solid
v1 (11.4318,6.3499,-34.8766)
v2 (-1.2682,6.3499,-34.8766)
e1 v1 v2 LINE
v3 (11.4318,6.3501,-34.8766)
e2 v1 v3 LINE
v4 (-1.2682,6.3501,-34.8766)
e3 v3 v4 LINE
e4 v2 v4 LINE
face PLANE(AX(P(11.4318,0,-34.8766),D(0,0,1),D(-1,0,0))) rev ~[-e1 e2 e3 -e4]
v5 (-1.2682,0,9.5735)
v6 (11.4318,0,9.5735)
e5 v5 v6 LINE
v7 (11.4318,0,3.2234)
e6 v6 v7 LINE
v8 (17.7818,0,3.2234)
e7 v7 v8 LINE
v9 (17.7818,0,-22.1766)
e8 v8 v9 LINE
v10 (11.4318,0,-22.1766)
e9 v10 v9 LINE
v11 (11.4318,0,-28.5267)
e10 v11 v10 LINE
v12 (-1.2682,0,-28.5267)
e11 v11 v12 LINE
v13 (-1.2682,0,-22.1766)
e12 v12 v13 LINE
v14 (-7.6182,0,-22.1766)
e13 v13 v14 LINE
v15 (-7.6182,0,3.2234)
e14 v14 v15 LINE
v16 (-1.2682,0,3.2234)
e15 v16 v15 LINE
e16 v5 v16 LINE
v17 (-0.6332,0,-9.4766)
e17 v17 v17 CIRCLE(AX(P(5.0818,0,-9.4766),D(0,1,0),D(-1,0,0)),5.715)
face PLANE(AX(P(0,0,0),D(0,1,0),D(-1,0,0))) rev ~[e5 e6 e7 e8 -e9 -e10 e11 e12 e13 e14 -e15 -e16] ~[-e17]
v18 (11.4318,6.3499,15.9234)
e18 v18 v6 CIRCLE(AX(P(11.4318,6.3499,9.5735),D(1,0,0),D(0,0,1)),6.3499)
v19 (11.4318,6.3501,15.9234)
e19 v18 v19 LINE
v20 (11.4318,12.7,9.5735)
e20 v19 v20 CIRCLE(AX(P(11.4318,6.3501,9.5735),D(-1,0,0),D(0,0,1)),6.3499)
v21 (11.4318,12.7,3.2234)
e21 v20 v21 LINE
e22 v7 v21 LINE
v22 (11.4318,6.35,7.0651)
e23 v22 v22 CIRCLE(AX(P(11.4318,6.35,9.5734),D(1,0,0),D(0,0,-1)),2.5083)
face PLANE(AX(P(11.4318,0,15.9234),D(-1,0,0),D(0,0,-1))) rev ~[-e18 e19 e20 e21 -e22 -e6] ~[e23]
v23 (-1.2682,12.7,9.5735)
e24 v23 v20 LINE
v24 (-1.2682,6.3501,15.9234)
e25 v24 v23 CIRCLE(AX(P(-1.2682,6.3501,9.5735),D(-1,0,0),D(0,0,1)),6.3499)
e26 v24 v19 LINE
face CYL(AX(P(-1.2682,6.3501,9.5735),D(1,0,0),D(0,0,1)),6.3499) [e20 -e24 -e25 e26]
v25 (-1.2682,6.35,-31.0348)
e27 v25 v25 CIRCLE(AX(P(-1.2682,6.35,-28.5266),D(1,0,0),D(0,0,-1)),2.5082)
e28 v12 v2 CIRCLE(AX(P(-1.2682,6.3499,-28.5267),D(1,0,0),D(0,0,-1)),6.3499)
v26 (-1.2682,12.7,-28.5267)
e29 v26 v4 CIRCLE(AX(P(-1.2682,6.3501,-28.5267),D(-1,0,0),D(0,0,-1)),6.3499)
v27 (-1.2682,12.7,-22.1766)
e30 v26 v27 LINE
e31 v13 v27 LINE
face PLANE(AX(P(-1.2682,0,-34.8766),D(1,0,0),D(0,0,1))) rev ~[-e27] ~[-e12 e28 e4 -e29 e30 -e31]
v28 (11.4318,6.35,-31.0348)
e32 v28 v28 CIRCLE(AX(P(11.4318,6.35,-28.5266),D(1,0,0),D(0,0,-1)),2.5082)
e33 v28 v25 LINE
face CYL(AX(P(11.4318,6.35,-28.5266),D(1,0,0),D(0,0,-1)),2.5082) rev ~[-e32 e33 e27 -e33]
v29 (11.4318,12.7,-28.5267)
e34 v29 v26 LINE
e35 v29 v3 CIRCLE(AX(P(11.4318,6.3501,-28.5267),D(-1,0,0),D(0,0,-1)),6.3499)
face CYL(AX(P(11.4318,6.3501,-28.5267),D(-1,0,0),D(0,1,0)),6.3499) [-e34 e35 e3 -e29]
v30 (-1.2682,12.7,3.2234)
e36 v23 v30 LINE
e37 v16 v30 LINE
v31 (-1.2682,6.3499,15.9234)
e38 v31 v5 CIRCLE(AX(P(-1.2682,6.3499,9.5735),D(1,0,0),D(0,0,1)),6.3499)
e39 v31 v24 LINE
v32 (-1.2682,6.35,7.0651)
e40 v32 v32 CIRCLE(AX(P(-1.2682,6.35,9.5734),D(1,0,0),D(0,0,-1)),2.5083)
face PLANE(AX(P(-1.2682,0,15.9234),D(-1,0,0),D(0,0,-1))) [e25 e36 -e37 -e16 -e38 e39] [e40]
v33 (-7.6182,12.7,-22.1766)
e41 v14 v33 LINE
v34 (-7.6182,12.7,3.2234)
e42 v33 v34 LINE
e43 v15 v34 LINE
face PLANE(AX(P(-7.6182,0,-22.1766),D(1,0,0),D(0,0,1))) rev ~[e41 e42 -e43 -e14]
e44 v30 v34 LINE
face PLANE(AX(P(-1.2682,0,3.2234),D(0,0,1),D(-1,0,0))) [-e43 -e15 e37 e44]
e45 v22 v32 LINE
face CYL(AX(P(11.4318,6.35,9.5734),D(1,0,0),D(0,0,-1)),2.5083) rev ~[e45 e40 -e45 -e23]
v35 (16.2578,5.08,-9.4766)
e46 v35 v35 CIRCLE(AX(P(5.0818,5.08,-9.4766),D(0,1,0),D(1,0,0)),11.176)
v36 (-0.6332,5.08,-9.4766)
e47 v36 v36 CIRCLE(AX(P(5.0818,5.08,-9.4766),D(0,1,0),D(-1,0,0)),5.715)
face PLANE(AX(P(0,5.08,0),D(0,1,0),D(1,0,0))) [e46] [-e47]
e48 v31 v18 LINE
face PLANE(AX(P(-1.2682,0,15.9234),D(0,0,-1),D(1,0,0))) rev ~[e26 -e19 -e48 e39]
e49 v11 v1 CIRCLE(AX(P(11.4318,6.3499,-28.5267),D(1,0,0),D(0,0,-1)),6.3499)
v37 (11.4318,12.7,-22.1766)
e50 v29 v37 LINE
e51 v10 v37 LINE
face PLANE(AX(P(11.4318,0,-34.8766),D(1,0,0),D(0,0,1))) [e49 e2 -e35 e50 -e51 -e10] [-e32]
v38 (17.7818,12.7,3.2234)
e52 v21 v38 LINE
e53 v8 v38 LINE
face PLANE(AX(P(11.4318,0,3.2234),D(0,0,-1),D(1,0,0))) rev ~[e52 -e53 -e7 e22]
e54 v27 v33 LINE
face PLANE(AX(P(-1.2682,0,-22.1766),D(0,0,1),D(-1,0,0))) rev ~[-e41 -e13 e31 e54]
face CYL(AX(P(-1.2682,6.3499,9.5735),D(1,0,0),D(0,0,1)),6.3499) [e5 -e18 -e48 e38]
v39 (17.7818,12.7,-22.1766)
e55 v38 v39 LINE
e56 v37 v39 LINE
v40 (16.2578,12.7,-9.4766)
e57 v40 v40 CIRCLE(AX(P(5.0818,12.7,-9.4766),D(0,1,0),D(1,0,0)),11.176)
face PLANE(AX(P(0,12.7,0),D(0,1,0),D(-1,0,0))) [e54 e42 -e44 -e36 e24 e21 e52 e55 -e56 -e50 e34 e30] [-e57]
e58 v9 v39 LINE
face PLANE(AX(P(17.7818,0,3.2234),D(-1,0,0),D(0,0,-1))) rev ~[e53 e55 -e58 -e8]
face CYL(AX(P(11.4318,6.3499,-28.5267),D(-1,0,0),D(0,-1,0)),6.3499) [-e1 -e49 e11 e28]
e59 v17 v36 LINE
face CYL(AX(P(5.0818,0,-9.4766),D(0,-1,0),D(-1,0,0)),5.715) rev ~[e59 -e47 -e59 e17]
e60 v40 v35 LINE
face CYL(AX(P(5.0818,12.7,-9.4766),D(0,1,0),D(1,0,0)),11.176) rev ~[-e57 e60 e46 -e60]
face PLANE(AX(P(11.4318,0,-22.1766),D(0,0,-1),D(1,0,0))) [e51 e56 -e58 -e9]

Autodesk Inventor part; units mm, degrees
ref_plane "YZ Plane" through (0, 0, 0) normal (1, 0, 0) x (0, 1, 0)
ref_plane "XZ Plane" through (0, 0, 0) normal (0, 1, 0) x (-1, 0, 0)
ref_plane "XY Plane" through (0, 0, 0) normal (0, 0, 1) x (1, 0, 0)
sketch "Sketch1" plane through (0, 0, 0) normal (0, 1, 0) x (-1, 0, 0)
  line L0 (7.6182, 15.9234) -> (-17.7818, 15.9234)
  line L1 (-17.7818, 15.9234) -> (-17.7818, -34.8766)
  line L2 (-17.7818, -34.8766) -> (7.6182, -34.8766)
  line L3 (7.6182, -34.8766) -> (7.6182, 15.9234)
  line L4 (7.6182, 15.9234) -> (1.2682, 15.9234)
  line L5 (1.2682, 15.9234) -> (1.2682, 3.2234)
  line L6 (1.2682, 3.2234) -> (7.6182, 3.2234)
  line L7 (7.6182, 3.2234) -> (7.6182, 15.9234)
  line L8 (-17.7818, 15.9234) -> (-11.4318, 15.9234)
  line L9 (-11.4318, 15.9234) -> (-11.4318, 3.2234)
  line L10 (-11.4318, 3.2234) -> (-17.7818, 3.2234)
  line L11 (-17.7818, 3.2234) -> (-17.7818, 15.9234)
  line L12 (-17.7818, -34.8766) -> (-11.4318, -34.8766)
  line L13 (-11.4318, -34.8766) -> (-11.4318, -22.1766)
  line L14 (-11.4318, -22.1766) -> (-17.7818, -22.1766)
  line L15 (-17.7818, -22.1766) -> (-17.7818, -34.8766)
  line L16 (7.6182, -34.8766) -> (1.2682, -34.8766)
  line L17 (1.2682, -34.8766) -> (1.2682, -22.1766)
  line L18 (1.2682, -22.1766) -> (7.6182, -22.1766)
  line L19 (7.6182, -22.1766) -> (7.6182, -34.8766)
  circle A0 centre (-5.0818, -9.4766) radius 5.715
  point P0 (0, 0)
  dimension "d0" = 25.4
  dimension "d1" = 50.8
  dimension "d2" = 6.35
  dimension "d3" = 12.7
  dimension "d4" = 6.35
  dimension "d5" = 12.7
  dimension "d6" = 6.35
  dimension "d7" = 12.7
  dimension "d8" = 11.43
extrude "Extrusion1" add sketch "Sketch1" along normal blind 12.7 contours L5 L6 L3 L18 L17 L2 L13 L14 L1 L10 L9 L0
sketch "Sketch2" plane through (11.4318, 0, 3.2234) normal (1, 0, 0) x (0, 0, -1)
  line L0 (-12.7, 0) -> (-12.7, 12.7) projected
  line L1 (-12.7, 12.7) -> (0, 12.7) projected
  line L2 (38.1, 12.7) -> (38.1, 0) projected
  circle A0 centre (-6.35, 6.35) radius 2.5083
  circle A1 centre (31.75, 6.35) radius 2.5082
  point P0 (3.2234, 0)
  dimension "d11" = 6.35
  dimension "d12" = 6.35
  dimension "d13" = 6.35
  dimension "d14" = 5.0165
  dimension "d15" = 5.0165
extrude "Extrusion2" cut sketch "Sketch2" against normal through all
sketch "Sketch3" plane through (0, 12.7, 0) normal (0, 1, 0) x (1, 0, 0)
  circle A0 centre (5.0818, 9.4766) radius 5.715 projected
  circle A1 centre (5.0818, 9.4766) radius 11.176
  point P0 (0, 0)
  dimension "d18" = 22.352
extrude "Extrusion3" cut sketch "Sketch3" against normal blind 7.62
fillet "Fillet1" radius 6.35 4 edges at (5.0818, 12.7, 15.9234) (5.0818, 0, 15.9234) (5.0818, 0, -34.8766) (5.0818, 12.7, -34.8766)
properties part number "top_anchor_v3"
